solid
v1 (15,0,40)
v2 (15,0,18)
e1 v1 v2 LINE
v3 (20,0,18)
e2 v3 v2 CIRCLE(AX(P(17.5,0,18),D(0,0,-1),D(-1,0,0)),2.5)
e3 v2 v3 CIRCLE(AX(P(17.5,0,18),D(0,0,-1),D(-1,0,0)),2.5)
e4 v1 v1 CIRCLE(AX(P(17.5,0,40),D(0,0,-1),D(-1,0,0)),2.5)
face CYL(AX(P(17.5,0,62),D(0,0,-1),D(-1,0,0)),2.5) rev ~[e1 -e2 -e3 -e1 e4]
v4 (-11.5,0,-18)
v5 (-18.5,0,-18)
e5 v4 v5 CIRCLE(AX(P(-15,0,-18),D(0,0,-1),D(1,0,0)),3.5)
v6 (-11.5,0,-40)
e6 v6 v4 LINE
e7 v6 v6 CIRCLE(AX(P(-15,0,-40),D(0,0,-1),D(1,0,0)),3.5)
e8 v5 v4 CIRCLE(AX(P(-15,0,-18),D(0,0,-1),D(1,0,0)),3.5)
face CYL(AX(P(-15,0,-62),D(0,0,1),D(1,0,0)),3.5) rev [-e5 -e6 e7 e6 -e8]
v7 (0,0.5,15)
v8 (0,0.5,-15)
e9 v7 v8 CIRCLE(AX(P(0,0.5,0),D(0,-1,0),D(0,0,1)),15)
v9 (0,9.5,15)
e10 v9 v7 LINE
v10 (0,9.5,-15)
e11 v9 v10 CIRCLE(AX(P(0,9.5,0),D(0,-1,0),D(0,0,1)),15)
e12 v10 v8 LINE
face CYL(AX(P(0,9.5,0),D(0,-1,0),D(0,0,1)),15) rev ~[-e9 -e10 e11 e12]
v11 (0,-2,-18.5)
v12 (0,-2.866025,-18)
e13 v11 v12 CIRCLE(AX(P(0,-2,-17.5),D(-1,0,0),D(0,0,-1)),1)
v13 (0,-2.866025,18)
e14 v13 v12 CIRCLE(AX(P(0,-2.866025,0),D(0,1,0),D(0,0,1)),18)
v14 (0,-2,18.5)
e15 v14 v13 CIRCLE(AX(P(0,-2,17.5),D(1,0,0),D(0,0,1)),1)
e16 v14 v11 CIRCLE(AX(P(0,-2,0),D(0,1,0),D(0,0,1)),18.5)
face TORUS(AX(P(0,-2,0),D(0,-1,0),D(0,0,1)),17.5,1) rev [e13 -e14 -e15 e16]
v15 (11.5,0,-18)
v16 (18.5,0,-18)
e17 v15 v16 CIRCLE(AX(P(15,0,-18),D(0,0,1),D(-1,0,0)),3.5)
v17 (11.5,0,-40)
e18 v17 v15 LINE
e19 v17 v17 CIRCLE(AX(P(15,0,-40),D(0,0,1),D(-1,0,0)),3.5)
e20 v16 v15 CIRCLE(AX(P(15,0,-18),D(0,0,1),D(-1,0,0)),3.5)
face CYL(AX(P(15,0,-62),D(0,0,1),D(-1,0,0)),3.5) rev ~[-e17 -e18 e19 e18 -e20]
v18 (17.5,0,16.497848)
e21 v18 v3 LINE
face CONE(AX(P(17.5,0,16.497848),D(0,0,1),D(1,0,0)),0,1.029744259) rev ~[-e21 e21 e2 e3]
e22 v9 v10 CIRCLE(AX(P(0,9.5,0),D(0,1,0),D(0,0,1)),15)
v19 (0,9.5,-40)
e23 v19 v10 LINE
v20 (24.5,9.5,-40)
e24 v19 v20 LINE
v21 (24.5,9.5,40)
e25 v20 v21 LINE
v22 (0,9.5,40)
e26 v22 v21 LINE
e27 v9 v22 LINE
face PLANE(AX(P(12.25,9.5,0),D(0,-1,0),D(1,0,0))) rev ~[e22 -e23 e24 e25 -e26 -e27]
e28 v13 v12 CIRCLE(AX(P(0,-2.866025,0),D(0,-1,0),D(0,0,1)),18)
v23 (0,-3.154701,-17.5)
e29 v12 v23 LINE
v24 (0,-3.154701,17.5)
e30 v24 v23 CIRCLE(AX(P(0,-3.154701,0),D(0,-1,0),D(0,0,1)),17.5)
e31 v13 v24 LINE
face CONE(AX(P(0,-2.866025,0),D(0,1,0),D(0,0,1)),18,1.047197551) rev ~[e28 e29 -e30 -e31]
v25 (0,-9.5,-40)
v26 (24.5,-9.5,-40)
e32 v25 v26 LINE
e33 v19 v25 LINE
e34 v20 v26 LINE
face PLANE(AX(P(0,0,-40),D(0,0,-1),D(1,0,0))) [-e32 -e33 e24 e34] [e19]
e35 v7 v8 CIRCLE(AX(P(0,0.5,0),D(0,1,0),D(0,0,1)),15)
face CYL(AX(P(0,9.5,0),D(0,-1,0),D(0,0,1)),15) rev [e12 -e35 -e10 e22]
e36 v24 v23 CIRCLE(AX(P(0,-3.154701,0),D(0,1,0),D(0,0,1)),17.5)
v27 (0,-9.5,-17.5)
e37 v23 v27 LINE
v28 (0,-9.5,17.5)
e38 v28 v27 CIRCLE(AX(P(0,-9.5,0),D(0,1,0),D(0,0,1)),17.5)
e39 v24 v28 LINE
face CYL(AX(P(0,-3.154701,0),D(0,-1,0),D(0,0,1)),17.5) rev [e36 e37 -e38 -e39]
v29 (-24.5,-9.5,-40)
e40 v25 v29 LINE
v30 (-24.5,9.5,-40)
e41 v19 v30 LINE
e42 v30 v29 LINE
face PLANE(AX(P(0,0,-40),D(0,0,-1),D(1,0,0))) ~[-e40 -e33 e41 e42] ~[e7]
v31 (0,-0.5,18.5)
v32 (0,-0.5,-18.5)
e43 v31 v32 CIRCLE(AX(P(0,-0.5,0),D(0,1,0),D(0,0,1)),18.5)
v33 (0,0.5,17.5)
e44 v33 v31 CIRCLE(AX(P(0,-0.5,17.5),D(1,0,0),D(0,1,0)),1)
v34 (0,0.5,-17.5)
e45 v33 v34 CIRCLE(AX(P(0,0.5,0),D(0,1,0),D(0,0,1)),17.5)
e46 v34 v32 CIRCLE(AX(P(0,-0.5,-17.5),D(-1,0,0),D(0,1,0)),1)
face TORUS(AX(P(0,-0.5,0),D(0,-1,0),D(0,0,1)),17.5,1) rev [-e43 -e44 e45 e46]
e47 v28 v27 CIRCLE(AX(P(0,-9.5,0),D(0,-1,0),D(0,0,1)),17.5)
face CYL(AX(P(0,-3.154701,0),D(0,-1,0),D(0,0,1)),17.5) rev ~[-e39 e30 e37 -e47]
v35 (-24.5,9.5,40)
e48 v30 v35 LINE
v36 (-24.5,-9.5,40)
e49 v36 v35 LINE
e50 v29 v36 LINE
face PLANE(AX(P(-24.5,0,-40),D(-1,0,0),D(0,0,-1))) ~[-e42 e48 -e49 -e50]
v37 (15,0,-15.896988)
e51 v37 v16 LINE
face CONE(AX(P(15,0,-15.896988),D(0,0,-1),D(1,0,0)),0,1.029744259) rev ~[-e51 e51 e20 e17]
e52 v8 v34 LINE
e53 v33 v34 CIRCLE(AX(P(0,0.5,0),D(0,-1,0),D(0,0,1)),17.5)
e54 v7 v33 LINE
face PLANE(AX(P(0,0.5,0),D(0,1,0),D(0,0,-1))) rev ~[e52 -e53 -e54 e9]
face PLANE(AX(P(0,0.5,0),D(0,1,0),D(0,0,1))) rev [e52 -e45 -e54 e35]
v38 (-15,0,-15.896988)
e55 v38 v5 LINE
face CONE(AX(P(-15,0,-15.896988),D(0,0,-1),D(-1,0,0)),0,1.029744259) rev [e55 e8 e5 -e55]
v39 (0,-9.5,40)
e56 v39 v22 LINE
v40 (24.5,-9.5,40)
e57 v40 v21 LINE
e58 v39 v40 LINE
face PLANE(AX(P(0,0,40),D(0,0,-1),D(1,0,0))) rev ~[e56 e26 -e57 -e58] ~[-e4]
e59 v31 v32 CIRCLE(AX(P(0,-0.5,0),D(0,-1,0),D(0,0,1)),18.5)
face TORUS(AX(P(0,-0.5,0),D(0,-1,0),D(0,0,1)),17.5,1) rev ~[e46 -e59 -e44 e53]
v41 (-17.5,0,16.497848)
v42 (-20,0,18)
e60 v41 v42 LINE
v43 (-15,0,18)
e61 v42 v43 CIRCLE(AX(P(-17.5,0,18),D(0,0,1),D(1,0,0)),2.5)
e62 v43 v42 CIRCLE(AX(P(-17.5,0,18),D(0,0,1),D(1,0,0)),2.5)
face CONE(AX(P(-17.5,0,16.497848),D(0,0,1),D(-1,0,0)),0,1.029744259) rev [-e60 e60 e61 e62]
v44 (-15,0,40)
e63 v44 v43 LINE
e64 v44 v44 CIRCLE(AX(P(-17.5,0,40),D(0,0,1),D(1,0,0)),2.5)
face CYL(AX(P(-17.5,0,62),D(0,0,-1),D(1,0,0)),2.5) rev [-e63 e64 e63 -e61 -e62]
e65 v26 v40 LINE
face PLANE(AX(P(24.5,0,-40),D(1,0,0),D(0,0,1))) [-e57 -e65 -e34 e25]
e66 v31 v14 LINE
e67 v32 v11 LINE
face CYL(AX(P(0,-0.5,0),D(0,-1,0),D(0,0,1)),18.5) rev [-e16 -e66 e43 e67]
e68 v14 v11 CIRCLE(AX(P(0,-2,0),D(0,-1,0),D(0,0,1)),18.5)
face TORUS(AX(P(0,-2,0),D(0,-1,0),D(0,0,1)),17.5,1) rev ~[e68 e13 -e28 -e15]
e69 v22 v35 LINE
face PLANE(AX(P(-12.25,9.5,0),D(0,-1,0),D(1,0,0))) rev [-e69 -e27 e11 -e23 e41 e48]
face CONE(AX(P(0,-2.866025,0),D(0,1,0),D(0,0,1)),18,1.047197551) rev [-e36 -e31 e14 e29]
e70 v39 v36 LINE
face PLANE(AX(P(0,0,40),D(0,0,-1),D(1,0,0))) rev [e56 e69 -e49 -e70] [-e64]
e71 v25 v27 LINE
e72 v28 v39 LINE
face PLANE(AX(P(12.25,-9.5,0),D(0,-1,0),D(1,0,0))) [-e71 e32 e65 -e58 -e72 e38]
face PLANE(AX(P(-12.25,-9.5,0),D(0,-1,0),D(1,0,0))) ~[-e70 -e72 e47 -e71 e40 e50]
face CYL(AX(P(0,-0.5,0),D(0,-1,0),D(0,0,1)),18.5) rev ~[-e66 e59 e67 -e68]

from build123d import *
from build123d import SkipClean  # not in build123d's __all__

# Parameters (mm, degrees)
F0_W     = 24.5
F0_H     = 80
F1_DEPTH = 9.5
F3_D     = 5
F3_DEPTH = 22
F3_TIP   = 1.5021515476
F5_D     = 7
F5_DEPTH = 22
F5_TIP   = 2.1030121666
F7_ANGLE = 180


with BuildPart() as f1:
    # F0 (on Front) → F1 (new body, symmetric)
    with BuildSketch(Plane.XZ):
        with Locations((12.25, 0)):
            Rectangle(F0_W, F0_H)
    extrude(amount=F1_DEPTH, both=True)

    # F3
    with Locations(Plane.XY.offset(40)):
        with Locations((17.5, 0)):
            Hole(F3_D / 2, depth=F3_DEPTH)
            with Locations((0, 0, -(F3_DEPTH + F3_TIP / 2))):  # 118° drill point
                Cone(0, F3_D / 2, F3_TIP, mode=Mode.SUBTRACT)

    # F5
    with Locations(Plane(origin=(0, 0, -40), x_dir=(1, 0, 0), z_dir=(0, 0, -1))):
        with Locations((15, 0)):
            Hole(F5_D / 2, depth=F5_DEPTH)
            with Locations((0, 0, -(F5_DEPTH + F5_TIP / 2))):  # 118° drill point
                Cone(0, F5_D / 2, F5_TIP, mode=Mode.SUBTRACT)

    # F6 (on Right) → F7 (revolve, cut)
    with BuildSketch(Plane.YZ):
        with BuildLine():
            Line((-9.5, 0), (9.5, 0))
            Line((9.5, 0), (9.5, 15))
            Line((9.5, 15), (0.5, 15))
            Line((0.5, 15), (0.5, 17.5))
            ThreePointArc((0.5, 17.5), (0.2071067812, 18.2071067812), (-0.5, 18.5))
            Line((-0.5, 18.5), (-2, 18.5))
            ThreePointArc((-2, 18.5), (-2.5, 18.3660254038), (-2.8660254038, 18))
            Line((-2.8660254038, 18), (-3.1547005384, 17.5))
            Line((-3.1547005384, 17.5), (-9.5, 17.5))
            Line((-9.5, 17.5), (-9.5, 0))
        make_face()
    revolve(axis=Axis((0, 0, 0), (0, 1, 0)), revolution_arc=F7_ANGLE, mode=Mode.SUBTRACT)

    # F8: F1 across plane


with BuildPart() as f1_1:
    add(f1.part, clean=False)
    with SkipClean():  # cleaning this boolean's faces spoils the solid; the shape is the same uncleaned
        add(f1.part.mirror(Plane.YZ), clean=False)


solid = f1_1.part
